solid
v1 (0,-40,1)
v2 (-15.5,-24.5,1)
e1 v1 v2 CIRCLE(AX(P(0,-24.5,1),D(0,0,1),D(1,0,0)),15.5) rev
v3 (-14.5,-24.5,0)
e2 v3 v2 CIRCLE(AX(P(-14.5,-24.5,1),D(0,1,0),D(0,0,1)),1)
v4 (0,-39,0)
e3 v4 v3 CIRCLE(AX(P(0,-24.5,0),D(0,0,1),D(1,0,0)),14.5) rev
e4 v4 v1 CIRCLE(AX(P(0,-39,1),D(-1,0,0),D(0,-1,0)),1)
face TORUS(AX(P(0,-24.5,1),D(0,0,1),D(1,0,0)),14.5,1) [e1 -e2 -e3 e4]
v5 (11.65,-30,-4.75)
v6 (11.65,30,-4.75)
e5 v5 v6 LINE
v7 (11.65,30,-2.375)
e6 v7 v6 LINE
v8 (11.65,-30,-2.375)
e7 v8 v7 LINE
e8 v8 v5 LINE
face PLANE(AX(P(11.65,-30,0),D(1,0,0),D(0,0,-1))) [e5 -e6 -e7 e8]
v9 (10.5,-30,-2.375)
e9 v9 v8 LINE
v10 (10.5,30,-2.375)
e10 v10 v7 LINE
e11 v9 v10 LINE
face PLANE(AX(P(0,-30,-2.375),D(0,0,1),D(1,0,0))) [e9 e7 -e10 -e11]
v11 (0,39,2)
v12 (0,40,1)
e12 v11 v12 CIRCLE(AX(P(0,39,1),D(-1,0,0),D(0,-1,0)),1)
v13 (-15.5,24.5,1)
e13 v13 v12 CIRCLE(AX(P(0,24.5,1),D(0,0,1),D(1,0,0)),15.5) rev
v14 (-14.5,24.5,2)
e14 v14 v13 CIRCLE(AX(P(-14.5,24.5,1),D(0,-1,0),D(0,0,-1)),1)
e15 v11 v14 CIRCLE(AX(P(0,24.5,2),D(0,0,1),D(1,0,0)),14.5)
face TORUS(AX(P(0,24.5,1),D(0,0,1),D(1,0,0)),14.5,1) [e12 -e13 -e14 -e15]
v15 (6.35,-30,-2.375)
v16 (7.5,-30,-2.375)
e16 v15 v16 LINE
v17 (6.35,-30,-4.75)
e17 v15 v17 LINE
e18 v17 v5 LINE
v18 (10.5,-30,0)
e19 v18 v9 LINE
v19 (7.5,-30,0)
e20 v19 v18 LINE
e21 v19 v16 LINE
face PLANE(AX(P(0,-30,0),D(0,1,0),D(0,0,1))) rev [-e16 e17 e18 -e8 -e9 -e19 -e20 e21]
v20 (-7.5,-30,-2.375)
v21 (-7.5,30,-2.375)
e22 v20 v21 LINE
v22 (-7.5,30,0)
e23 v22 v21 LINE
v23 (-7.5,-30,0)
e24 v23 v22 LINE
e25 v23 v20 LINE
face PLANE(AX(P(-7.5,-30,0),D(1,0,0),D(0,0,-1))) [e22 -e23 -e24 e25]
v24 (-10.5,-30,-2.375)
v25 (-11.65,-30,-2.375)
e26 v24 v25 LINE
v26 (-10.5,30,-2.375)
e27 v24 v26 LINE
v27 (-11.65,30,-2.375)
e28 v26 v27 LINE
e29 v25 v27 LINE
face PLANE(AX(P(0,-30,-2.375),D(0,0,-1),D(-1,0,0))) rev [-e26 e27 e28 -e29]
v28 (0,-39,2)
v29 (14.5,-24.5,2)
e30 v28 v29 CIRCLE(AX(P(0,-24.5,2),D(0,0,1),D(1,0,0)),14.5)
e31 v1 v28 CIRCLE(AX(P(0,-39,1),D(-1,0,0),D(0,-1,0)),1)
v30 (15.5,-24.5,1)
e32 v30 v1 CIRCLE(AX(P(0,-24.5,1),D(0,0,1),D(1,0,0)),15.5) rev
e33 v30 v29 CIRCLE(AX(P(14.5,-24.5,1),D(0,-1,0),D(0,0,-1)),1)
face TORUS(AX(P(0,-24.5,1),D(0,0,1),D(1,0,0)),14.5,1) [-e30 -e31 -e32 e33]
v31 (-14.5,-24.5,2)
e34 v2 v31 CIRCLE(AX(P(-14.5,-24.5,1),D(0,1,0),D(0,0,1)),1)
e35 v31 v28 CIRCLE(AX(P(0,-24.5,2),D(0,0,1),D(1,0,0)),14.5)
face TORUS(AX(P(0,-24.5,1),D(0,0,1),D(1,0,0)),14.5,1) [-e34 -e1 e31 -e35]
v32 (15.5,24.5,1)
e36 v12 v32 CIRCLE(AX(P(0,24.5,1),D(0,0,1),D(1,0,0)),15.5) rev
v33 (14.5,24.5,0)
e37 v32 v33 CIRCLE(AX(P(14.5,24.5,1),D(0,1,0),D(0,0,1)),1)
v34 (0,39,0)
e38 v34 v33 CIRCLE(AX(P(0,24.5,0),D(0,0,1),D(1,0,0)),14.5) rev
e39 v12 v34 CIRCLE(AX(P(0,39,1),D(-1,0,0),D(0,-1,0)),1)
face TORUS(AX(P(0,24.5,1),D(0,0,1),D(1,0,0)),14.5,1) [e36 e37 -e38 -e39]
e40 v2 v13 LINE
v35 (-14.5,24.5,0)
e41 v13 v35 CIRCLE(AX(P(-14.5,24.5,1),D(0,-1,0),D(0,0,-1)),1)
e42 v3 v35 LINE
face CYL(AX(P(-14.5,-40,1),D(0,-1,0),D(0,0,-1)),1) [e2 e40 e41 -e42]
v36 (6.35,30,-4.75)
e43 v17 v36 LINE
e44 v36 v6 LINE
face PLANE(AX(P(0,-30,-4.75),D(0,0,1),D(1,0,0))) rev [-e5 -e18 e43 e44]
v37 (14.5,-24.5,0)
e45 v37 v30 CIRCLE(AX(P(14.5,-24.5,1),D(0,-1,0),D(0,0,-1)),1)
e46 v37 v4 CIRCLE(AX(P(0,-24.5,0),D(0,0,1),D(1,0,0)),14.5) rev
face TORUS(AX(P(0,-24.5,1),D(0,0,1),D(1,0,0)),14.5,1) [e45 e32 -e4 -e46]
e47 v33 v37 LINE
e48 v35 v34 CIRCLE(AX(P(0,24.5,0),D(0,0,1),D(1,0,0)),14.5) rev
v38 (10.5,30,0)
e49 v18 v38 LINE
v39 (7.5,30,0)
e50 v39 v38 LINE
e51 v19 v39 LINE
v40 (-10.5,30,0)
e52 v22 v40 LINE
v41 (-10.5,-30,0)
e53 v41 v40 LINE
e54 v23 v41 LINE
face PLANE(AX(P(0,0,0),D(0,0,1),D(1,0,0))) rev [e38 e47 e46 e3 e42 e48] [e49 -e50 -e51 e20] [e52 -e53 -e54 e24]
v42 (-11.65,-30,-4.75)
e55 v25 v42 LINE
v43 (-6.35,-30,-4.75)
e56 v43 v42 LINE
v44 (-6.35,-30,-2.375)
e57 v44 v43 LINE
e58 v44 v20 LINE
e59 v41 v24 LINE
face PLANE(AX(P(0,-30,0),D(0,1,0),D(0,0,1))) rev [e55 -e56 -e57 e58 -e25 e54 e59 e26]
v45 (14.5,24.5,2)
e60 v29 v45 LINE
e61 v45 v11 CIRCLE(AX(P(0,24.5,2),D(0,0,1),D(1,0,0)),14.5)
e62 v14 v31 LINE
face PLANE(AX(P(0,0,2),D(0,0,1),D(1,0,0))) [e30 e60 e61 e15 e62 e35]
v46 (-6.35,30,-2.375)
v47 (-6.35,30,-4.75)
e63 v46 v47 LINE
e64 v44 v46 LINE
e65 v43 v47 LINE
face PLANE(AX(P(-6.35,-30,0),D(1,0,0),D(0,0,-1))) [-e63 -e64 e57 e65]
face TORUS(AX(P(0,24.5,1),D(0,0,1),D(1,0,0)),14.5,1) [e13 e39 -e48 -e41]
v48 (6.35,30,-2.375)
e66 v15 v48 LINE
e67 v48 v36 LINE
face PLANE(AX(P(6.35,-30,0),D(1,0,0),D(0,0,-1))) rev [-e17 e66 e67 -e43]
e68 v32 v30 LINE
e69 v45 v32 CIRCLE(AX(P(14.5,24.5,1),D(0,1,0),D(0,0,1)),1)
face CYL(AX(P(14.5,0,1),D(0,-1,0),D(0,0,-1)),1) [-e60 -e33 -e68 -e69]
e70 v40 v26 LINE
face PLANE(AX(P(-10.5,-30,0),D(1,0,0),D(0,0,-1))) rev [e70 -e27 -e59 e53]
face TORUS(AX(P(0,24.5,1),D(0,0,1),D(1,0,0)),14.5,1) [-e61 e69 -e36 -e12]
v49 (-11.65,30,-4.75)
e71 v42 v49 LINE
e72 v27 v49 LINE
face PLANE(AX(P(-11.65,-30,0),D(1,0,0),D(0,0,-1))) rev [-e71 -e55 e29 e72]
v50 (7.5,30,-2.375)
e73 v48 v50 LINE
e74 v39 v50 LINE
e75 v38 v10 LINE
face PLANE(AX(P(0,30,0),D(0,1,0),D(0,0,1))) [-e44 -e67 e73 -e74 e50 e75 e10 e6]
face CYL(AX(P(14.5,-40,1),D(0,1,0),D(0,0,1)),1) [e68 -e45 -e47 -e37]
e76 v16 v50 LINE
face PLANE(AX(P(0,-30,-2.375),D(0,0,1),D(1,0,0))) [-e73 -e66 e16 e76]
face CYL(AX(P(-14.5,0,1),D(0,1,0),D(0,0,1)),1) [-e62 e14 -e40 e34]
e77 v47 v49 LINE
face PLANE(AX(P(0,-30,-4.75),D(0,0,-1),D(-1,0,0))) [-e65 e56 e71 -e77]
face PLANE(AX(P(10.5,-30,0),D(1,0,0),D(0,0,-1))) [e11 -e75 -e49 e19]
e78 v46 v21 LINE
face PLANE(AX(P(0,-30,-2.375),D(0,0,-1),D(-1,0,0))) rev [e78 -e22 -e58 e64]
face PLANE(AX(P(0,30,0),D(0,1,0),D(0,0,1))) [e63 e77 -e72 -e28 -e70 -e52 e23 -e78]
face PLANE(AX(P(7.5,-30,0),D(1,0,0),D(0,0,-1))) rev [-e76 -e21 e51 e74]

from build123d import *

# Parameters (mm, degrees)
SKETCH1_W                = 31
SKETCH1_H                = 80
BOSS_EXTRUDE1_DEPTH      = 2
FILLET1_R                = 15.5
BOSS_EXTRUDE2_DEPTH      = 30
BOSS_EXTRUDE2_DEPTH_BACK = 30
FILLET3_R                = 1


with BuildPart() as part:
    # Sketch1 → Boss-Extrude1 (new body)
    with BuildSketch(Plane.XY):
        Rectangle(SKETCH1_W, SKETCH1_H)
    extrude(amount=BOSS_EXTRUDE1_DEPTH)

    # Fillet1
    fillet1_edges = [part.edges().sort_by_distance(p)[0] for p in [
        (-15.5, 40, 1),
        (15.5, -40, 1),
        (-15.5, -40, 1),
        (15.5, 40, 1),
    ]]
    fillet(fillet1_edges, radius=FILLET1_R - 0.0001)  # a hair under: the kernel refuses the full size

    # Sketch2 → Boss-Extrude2 (add, two sides: drawn at the far end of the back side and taken through both)
    with BuildSketch(Plane(origin=(0, 0, 0), x_dir=(1, 0, 0), z_dir=(0, 1, 0)).offset(-BOSS_EXTRUDE2_DEPTH_BACK)):
        Polygon((-10.5, 0), (-7.5, 0), (-7.5, 2.375), (-6.35, 2.375), (-6.35, 4.75), (-7.5, 4.75), (-10.5, 4.75), (-11.65, 4.75), (-11.65, 2.375), (-10.5, 2.375), align=None)
        Polygon((10.5, 0), (10.5, 2.375), (11.65, 2.375), (11.65, 4.75), (6.35, 4.75), (6.35, 2.375), (7.5, 2.375), (7.5, 0), align=None)
    extrude(amount=BOSS_EXTRUDE2_DEPTH + BOSS_EXTRUDE2_DEPTH_BACK)

    # Fillet3
    fillet3_edges = [part.edges().sort_by_distance(p)[0] for p in [
        (-15.5, 0, 0),
        (-10.960184398, -35.460184398, 0),
        (10.960184398, -35.460184398, 0),
        (15.5, 0, 0),
        (10.960184398, 35.460184398, 0),
        (10.960184398, 35.460184398, 2),
        (15.5, 0, 2),
        (10.960184398, -35.460184398, 2),
        (-10.960184398, -35.460184398, 2),
        (-15.5, 0, 2),
        (-10.960184398, 35.460184398, 0),
        (-10.960184398, 35.460184398, 2),
    ]]
    fillet(fillet3_edges, radius=FILLET3_R - 0.0001)  # a hair under: the kernel refuses the full size


solid = part.part
